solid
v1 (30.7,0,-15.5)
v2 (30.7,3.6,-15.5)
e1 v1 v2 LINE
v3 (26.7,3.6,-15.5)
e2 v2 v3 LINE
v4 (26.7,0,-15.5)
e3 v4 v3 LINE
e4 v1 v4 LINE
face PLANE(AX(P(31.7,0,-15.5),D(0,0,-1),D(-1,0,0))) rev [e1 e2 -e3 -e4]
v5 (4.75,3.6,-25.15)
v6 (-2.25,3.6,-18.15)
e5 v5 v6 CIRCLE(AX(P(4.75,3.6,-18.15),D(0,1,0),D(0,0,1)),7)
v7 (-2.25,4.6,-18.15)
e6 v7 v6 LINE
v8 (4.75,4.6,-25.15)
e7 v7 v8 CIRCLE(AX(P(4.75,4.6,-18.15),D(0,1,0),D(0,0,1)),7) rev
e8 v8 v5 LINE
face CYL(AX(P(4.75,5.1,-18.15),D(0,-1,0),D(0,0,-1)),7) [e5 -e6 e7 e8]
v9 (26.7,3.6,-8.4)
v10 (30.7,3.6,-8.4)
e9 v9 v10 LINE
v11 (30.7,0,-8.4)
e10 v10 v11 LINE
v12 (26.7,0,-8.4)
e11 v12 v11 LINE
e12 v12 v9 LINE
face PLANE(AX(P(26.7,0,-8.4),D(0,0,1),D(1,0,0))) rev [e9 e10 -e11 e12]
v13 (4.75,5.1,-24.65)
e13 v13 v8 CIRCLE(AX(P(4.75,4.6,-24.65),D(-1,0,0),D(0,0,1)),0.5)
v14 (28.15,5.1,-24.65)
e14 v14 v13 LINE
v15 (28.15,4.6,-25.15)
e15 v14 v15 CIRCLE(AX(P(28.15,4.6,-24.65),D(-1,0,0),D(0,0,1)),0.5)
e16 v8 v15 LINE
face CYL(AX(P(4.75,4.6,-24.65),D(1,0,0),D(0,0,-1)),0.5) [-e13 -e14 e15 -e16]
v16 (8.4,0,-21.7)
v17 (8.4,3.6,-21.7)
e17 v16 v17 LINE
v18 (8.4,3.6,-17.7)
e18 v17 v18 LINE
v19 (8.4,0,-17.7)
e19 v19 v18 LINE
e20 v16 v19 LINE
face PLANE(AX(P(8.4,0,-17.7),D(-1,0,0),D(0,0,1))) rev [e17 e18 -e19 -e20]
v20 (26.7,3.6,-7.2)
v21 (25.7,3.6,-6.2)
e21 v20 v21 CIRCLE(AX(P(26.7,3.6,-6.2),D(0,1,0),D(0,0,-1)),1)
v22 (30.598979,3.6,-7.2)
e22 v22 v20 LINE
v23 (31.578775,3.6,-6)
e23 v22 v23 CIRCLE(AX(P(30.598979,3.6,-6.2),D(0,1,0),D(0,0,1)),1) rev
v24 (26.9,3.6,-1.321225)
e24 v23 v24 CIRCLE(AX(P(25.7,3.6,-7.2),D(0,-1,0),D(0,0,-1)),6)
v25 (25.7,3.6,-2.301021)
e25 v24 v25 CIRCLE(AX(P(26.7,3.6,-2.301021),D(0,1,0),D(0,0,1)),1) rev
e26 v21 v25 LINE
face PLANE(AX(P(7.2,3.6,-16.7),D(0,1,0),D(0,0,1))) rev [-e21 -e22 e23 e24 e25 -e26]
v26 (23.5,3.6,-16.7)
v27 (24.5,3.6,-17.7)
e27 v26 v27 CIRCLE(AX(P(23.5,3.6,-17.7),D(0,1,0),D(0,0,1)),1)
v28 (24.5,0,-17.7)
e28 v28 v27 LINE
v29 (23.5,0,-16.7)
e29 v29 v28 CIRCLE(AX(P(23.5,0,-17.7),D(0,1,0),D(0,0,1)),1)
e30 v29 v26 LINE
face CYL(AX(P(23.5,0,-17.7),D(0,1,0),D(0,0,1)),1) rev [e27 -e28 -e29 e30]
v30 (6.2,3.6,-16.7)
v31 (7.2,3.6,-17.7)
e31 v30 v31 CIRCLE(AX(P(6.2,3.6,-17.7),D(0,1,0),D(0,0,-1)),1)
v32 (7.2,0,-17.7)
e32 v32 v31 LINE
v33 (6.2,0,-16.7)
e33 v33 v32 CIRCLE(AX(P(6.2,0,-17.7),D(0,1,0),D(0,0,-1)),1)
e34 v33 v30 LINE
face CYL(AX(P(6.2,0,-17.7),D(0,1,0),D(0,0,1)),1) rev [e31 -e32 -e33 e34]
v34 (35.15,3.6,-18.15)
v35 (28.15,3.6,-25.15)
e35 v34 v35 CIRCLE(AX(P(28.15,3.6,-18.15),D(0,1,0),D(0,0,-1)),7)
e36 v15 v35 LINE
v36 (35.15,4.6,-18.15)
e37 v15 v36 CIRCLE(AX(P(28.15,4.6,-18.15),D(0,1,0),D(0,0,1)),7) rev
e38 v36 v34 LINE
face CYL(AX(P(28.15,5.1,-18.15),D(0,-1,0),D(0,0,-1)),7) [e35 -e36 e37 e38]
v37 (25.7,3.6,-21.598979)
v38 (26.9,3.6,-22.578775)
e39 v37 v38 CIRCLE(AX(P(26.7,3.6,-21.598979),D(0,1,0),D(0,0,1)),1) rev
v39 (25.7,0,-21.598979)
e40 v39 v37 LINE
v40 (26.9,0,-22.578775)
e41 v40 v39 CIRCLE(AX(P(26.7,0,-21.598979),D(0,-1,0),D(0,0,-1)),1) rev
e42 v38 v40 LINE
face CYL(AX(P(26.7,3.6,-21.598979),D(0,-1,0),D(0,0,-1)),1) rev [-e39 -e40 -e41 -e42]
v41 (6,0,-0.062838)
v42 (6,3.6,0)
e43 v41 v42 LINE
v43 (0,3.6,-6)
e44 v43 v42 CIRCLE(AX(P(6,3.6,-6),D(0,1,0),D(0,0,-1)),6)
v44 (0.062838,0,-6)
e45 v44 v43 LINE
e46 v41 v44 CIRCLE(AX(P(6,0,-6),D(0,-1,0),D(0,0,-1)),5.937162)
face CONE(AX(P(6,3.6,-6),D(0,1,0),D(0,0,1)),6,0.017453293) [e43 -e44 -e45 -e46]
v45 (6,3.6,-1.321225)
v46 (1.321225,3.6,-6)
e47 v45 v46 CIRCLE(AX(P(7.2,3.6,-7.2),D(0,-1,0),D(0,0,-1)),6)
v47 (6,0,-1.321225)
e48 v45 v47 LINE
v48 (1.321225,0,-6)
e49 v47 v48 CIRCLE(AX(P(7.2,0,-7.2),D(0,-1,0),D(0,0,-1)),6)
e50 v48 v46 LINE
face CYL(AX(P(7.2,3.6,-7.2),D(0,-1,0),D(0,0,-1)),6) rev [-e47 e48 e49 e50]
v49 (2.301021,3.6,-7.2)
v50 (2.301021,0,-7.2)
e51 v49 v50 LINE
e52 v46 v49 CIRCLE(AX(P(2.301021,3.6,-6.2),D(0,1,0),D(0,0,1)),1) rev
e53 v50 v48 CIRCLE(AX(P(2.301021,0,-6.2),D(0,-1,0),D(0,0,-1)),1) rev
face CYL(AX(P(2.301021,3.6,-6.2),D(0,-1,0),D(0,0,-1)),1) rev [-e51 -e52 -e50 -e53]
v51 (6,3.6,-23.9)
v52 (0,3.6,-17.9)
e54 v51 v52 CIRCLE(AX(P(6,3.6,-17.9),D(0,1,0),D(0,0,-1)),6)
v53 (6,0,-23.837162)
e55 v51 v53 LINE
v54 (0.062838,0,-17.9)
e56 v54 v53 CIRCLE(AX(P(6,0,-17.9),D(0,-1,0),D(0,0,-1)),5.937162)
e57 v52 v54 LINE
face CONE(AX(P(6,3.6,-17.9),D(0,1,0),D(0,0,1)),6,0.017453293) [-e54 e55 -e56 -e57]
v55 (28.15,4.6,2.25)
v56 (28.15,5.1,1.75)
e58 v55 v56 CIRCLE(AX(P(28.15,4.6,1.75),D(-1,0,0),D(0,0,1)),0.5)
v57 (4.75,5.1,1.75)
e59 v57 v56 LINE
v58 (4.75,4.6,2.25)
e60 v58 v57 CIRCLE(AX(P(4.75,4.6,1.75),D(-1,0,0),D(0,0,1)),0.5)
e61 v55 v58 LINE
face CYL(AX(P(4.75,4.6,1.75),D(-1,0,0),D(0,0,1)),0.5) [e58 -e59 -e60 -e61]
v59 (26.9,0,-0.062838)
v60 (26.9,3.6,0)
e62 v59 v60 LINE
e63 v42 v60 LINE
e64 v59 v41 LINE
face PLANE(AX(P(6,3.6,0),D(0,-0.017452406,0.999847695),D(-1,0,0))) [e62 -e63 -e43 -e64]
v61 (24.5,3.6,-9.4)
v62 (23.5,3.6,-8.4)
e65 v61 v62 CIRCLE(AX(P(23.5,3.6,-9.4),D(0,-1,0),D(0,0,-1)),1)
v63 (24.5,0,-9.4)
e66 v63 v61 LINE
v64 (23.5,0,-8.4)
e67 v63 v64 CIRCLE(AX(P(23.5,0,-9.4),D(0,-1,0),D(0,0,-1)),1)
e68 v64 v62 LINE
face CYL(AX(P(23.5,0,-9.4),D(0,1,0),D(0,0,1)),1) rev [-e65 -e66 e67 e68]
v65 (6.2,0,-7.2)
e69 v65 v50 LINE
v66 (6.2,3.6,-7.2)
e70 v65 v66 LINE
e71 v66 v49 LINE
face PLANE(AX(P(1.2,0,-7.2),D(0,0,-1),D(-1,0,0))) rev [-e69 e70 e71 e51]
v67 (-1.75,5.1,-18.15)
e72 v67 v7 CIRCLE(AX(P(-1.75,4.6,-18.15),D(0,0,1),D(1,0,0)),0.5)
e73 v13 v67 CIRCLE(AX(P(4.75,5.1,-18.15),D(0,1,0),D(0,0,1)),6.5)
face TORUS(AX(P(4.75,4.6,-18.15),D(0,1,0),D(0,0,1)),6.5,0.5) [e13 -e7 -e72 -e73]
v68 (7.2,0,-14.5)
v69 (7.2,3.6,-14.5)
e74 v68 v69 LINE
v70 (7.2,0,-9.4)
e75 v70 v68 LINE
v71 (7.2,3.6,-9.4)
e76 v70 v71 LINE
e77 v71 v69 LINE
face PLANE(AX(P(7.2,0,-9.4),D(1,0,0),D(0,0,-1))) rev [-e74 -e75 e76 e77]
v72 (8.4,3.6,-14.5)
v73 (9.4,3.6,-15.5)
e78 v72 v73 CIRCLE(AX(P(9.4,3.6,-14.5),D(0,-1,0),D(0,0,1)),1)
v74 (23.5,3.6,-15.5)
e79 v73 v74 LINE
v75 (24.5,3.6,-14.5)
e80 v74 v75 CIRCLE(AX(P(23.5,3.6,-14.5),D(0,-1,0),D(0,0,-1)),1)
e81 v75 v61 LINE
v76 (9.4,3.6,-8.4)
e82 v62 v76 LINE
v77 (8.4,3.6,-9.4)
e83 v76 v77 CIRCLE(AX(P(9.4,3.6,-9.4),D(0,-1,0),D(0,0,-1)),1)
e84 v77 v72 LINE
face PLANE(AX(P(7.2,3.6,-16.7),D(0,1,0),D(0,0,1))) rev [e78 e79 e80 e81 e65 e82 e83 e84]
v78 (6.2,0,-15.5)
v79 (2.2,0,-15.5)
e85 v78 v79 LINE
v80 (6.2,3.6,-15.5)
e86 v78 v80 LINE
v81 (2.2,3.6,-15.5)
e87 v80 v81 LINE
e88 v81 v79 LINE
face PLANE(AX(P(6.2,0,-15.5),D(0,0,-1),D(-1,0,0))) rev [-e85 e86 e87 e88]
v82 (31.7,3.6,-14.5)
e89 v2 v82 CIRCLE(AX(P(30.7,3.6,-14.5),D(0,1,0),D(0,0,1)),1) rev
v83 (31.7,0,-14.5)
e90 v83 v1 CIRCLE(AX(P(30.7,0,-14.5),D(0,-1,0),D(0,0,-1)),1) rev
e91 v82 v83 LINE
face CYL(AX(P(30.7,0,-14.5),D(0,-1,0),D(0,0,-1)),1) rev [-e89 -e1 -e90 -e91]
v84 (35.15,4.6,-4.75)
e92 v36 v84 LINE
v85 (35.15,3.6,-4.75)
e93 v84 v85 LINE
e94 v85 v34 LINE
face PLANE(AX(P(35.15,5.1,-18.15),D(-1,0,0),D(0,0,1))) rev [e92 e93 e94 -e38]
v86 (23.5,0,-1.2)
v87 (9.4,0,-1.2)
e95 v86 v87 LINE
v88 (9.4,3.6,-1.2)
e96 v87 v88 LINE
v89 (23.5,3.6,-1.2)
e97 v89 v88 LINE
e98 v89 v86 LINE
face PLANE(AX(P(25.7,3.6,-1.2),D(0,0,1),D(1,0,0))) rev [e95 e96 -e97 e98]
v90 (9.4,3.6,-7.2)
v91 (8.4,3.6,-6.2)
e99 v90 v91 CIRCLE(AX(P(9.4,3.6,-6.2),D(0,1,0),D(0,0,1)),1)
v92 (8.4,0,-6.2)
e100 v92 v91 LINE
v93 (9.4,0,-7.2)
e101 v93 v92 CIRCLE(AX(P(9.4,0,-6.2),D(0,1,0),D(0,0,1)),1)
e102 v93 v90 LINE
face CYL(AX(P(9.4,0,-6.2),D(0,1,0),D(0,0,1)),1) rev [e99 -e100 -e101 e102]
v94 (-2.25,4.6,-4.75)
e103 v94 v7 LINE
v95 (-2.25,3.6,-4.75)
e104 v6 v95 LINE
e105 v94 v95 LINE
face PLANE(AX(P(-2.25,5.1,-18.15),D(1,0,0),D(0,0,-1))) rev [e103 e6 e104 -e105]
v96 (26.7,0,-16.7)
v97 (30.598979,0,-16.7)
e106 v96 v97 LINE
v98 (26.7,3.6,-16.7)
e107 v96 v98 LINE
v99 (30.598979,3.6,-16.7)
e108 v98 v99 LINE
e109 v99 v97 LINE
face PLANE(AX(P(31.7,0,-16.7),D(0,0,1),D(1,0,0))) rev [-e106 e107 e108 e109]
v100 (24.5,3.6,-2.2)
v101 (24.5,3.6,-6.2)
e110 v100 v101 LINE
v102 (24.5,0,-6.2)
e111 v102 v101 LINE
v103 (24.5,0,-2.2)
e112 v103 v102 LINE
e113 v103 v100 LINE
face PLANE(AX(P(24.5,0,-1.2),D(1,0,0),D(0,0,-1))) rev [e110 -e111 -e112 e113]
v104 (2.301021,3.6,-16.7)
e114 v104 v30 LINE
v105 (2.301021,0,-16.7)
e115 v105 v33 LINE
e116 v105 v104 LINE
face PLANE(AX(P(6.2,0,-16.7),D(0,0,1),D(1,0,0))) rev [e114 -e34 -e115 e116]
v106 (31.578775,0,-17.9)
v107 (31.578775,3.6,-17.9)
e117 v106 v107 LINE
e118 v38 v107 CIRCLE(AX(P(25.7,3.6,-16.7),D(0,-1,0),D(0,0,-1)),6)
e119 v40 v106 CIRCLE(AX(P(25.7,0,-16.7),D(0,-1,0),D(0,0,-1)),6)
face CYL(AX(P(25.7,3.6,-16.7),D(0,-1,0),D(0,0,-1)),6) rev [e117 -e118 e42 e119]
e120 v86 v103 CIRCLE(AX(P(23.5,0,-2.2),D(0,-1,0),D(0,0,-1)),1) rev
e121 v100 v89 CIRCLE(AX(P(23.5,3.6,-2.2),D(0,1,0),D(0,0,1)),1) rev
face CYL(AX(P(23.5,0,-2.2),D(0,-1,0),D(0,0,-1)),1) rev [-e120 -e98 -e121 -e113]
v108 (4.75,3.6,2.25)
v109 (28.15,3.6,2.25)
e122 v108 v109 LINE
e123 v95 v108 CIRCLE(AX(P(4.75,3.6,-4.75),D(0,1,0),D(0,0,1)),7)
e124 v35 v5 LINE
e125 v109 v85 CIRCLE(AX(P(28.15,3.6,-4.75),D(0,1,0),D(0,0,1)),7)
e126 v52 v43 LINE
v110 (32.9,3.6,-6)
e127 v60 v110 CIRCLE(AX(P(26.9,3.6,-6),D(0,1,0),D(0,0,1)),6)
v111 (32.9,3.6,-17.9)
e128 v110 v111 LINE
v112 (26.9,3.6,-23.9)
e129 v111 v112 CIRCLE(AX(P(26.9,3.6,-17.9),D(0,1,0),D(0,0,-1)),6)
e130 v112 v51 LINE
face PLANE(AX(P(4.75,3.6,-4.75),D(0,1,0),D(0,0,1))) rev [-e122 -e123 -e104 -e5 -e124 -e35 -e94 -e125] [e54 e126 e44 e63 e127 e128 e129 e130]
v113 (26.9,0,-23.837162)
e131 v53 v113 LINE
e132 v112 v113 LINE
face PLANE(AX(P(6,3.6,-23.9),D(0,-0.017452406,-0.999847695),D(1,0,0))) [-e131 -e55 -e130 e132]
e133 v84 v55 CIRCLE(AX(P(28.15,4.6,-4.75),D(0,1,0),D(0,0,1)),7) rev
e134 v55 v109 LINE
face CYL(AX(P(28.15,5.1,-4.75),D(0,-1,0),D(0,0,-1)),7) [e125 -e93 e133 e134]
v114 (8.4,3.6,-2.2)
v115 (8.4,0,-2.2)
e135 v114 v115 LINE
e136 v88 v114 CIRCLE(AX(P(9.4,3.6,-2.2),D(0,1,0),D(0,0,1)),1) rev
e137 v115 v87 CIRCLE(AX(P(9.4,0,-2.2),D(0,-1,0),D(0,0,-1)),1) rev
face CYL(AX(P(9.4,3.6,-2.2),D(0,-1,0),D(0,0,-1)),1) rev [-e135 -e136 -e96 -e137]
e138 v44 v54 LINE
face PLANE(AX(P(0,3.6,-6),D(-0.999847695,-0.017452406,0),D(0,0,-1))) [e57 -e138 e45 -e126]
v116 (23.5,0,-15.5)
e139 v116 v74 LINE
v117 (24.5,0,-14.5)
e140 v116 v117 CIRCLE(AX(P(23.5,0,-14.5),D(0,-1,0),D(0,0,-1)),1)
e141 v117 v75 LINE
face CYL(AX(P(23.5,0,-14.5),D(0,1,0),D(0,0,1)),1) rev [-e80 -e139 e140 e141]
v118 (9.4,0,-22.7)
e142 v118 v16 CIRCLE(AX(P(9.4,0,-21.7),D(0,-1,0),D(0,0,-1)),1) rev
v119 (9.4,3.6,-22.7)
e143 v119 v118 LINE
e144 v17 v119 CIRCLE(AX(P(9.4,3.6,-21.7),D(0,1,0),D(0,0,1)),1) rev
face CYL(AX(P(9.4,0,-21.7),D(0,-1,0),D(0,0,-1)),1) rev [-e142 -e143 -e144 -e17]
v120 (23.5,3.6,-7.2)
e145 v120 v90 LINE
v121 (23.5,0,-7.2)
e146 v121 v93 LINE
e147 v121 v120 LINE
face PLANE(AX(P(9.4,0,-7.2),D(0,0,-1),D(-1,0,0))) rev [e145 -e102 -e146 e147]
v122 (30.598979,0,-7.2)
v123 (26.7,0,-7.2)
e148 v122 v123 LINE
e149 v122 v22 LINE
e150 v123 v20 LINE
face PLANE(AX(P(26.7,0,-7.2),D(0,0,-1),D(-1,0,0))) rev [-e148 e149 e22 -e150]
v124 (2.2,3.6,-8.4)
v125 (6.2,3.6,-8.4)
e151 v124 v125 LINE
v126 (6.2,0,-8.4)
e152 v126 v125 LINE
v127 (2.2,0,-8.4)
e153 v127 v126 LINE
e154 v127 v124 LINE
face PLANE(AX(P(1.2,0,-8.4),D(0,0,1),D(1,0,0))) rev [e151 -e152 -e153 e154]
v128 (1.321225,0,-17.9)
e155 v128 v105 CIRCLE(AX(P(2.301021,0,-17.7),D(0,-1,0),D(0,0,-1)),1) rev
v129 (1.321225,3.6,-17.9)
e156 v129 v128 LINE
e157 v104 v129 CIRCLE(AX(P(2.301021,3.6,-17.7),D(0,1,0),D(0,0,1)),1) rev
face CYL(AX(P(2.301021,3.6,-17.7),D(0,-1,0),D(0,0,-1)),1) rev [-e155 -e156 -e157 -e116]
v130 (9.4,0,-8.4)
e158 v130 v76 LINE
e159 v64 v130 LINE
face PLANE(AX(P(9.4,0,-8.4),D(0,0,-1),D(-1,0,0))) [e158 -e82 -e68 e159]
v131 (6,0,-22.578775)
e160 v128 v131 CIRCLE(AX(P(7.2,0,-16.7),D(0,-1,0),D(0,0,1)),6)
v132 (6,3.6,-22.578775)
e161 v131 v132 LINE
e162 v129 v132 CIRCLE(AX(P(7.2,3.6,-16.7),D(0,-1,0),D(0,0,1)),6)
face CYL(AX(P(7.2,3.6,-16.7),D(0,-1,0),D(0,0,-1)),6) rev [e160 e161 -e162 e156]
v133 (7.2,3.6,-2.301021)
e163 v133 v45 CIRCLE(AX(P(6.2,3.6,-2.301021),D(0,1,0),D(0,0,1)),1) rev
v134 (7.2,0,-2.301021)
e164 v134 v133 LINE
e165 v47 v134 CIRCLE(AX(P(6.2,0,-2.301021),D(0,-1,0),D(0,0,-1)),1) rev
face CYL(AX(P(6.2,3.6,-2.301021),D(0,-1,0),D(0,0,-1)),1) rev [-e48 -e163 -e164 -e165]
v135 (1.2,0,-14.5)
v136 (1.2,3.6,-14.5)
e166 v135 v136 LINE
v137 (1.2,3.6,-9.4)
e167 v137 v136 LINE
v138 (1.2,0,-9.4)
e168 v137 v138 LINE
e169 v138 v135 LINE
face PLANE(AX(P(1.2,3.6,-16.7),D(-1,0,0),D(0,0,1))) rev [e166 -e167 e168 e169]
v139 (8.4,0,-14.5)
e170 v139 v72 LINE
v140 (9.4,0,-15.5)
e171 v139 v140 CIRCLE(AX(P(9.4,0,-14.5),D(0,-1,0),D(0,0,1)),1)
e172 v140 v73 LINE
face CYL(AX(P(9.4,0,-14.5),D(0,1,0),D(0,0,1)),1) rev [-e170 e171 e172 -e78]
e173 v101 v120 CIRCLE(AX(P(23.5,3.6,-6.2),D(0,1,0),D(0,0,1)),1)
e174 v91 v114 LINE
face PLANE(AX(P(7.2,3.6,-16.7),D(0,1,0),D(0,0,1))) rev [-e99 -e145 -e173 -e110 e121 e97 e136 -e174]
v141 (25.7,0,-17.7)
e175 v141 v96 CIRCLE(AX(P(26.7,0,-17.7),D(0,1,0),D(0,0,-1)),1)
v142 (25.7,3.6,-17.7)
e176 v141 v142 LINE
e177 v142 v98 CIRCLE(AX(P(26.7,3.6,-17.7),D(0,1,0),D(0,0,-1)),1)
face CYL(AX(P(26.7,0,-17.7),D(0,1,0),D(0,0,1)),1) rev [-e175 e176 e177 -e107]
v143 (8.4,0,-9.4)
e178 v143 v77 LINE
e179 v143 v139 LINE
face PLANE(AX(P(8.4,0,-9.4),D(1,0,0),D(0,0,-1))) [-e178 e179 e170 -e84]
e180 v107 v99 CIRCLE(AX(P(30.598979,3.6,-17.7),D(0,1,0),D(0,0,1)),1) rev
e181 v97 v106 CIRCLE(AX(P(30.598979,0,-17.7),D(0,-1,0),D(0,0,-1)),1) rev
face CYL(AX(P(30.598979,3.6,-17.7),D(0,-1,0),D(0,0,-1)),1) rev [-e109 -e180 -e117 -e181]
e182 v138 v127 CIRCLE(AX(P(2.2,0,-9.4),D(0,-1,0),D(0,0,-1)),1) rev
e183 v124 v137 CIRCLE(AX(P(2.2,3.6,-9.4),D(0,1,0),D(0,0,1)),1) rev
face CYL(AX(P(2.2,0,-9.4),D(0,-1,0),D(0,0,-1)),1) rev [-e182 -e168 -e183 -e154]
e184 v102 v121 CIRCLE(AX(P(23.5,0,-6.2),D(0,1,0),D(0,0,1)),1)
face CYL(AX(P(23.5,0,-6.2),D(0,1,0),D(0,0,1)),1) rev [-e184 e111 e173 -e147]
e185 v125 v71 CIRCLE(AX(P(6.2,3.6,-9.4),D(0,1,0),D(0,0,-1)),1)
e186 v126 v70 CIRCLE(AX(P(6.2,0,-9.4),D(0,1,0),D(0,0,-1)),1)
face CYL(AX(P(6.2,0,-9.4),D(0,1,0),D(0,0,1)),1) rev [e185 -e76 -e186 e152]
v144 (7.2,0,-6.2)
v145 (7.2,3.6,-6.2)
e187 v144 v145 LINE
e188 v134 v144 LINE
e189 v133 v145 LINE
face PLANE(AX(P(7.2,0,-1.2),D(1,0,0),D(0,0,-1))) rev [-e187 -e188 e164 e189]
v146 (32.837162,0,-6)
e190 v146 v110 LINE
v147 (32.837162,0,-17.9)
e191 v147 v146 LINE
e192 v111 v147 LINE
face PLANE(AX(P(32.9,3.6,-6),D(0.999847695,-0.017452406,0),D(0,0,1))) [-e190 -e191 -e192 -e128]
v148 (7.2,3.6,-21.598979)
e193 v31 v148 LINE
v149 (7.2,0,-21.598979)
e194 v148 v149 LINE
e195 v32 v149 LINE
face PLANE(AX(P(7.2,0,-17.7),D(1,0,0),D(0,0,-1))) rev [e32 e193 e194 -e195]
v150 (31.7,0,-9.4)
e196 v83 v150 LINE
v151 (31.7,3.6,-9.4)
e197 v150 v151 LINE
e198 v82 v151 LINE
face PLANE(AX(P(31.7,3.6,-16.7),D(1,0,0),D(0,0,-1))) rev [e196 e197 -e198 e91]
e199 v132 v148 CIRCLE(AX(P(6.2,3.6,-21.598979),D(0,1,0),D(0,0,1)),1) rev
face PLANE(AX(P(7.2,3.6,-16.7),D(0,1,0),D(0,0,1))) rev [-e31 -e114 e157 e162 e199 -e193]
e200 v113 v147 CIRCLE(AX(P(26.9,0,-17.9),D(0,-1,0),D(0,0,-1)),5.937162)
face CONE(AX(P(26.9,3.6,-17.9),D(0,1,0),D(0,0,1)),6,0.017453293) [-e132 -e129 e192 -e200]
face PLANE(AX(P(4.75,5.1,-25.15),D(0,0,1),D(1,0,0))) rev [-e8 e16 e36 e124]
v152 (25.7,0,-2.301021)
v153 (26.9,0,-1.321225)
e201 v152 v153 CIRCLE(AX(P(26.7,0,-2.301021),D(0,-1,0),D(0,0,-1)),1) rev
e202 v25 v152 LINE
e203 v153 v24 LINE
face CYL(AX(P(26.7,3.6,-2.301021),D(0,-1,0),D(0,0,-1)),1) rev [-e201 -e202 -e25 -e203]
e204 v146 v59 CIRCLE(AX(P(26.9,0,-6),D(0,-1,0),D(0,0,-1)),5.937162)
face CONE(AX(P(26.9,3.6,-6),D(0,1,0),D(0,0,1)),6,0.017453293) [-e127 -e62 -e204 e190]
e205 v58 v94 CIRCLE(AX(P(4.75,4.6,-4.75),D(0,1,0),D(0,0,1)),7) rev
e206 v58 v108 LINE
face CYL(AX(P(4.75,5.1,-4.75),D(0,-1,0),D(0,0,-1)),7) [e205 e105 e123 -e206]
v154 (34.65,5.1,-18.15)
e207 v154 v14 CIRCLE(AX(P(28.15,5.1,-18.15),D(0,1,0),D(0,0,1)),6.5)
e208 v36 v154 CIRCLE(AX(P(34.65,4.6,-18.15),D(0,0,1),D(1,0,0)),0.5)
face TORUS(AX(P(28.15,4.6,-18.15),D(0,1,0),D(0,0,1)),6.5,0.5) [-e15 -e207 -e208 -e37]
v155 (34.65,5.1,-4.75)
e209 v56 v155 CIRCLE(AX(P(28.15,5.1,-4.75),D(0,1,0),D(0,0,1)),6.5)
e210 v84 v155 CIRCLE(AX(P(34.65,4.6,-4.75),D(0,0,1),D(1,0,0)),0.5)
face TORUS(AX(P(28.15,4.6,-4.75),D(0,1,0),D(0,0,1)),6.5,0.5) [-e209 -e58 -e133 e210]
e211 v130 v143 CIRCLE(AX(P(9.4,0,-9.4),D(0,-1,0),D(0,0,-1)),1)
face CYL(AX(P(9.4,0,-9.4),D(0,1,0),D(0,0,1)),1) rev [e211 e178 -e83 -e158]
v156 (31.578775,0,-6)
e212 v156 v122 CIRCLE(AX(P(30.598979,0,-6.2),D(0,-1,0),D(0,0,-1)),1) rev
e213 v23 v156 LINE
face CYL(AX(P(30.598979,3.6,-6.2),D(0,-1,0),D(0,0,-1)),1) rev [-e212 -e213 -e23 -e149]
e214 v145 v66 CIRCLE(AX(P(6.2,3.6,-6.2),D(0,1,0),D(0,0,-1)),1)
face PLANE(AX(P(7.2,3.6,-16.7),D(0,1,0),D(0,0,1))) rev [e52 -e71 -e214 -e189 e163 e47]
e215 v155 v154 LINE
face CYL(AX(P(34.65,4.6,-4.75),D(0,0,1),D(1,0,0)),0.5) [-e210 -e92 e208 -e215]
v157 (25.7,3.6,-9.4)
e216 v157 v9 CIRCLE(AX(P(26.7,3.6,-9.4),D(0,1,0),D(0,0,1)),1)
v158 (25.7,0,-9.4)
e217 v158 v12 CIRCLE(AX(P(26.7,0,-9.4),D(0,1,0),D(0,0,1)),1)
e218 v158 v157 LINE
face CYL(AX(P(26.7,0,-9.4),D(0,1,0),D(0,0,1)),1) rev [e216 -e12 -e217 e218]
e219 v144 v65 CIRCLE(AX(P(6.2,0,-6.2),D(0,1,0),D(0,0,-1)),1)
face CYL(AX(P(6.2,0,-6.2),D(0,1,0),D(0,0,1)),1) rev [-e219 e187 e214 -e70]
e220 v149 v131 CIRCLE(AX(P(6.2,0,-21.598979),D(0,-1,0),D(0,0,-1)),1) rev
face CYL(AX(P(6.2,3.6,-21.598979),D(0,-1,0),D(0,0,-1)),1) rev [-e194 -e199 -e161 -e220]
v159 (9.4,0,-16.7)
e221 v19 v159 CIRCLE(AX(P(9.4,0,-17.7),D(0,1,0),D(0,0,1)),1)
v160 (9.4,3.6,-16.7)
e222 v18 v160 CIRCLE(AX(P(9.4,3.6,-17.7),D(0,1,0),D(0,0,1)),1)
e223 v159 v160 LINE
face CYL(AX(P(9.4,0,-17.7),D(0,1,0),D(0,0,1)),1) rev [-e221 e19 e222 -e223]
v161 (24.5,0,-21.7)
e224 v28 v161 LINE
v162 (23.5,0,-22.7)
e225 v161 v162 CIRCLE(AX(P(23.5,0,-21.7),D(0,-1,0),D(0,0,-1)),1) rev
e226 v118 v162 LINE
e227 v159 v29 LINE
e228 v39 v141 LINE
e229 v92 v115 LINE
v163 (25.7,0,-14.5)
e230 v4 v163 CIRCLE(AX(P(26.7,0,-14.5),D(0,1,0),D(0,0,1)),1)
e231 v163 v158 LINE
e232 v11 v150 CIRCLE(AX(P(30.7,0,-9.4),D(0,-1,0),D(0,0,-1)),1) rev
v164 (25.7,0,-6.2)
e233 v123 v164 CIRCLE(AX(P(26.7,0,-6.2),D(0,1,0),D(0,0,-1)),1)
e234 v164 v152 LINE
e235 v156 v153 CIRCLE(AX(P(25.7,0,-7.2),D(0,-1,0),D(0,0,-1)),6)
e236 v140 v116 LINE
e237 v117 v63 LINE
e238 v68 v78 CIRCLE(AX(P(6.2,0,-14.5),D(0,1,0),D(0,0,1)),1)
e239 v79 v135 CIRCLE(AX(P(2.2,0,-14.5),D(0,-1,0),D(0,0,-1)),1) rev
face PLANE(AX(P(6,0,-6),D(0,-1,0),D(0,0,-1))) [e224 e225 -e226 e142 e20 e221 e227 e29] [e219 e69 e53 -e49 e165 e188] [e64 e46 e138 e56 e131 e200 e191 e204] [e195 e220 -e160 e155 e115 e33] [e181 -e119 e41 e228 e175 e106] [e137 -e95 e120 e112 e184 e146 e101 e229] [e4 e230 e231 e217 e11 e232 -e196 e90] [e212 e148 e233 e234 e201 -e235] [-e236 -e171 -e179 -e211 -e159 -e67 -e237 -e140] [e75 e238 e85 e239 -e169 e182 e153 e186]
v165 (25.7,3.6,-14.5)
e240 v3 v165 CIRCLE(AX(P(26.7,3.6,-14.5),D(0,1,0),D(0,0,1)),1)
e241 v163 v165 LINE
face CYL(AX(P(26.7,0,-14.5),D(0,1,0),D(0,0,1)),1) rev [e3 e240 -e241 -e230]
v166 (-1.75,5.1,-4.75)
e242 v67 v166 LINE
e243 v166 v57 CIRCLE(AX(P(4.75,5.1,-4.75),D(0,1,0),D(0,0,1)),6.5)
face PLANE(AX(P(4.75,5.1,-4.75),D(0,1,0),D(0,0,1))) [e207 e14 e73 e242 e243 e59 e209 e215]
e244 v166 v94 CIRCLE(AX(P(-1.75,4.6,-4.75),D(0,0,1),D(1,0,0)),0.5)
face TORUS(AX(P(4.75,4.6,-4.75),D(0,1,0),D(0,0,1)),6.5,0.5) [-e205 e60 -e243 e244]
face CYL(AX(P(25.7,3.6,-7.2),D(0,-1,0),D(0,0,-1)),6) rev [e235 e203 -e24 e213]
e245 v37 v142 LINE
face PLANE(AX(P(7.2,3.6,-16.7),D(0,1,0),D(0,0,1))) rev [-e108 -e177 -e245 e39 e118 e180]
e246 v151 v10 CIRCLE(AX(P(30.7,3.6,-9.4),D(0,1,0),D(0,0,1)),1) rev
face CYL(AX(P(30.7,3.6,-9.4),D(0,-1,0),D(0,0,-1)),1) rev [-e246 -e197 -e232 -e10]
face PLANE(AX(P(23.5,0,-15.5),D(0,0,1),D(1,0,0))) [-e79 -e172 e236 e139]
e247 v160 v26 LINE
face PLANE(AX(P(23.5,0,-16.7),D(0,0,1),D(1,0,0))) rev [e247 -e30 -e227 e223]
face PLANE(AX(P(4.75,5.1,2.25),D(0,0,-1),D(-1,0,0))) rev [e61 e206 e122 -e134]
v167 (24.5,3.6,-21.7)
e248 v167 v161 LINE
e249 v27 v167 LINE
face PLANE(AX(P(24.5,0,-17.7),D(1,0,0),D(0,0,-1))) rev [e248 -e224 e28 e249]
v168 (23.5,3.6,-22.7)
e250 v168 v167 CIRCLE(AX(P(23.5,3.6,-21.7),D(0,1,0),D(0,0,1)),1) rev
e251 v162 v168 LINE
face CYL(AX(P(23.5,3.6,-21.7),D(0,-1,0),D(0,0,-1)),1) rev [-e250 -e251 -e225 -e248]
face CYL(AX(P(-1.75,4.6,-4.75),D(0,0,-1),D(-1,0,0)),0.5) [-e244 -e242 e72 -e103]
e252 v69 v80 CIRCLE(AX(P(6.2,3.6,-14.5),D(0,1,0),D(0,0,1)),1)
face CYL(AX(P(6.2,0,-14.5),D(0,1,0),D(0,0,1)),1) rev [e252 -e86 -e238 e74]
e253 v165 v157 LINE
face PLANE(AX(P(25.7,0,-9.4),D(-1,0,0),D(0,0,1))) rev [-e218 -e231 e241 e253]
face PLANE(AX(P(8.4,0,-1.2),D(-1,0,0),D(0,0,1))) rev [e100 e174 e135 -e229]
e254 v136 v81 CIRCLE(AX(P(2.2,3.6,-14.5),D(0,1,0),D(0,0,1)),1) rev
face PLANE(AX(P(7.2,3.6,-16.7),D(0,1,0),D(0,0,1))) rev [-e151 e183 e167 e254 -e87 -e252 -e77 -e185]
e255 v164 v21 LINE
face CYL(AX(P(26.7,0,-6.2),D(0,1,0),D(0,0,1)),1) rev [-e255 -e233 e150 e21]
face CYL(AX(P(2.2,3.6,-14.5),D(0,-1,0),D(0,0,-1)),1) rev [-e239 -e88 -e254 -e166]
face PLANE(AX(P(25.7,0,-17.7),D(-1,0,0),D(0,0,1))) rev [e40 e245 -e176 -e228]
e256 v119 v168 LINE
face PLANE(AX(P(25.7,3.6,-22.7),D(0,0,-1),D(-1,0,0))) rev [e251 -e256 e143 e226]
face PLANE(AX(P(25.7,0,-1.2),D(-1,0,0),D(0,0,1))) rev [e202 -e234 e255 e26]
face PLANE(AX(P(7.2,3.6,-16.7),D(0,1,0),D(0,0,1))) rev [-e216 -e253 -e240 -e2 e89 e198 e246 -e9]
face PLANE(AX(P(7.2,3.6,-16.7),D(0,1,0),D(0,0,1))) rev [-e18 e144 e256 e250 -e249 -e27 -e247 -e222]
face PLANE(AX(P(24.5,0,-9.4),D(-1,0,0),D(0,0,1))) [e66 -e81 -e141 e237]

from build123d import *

# Parameters (mm, degrees)
BOSS_EXTRUDE1_DEPTH = 3.6
BOSS_EXTRUDE2_DEPTH = 1.5
CUT_EXTRUDE1_DEPTH  = 3.6
BOSS_EXTRUDE5_DEPTH = 3.6
CHAMFER1_SIZE       = 3.6
CHAMFER1_SIZE_2     = 0.062838234
FILLET3_R           = 1
FILLET4_R           = 0.5


with BuildPart() as part:
    # Sketch1 → Boss-Extrude1 (new body)
    with BuildSketch(Plane(origin=(0, 0, 0), x_dir=(1, 0, 0), z_dir=(0, 1, 0))):
        with BuildLine():
            Line((6, 0), (26.9, 0))
            ThreePointArc((26.9, 0), (31.142640687, 1.757359313), (32.9, 6))
            Line((32.9, 6), (32.9, 17.9))
            ThreePointArc((32.9, 17.9), (31.142640687, 22.142640687), (26.9, 23.9))
            Line((26.9, 23.9), (6, 23.9))
            ThreePointArc((6, 23.9), (1.757359313, 22.142640687), (0, 17.9))
            Line((0, 17.9), (0, 6))
            ThreePointArc((0, 6), (1.757359313, 1.757359313), (6, 0))
        make_face()
    extrude(amount=BOSS_EXTRUDE1_DEPTH)

    # Sketch2 → Boss-Extrude2 (add)
    with BuildSketch(Plane(origin=(0, 3.6, 0), x_dir=(1, 0, 0), z_dir=(0, 1, 0))):
        with BuildLine():
            Line((4.75, 25.15), (28.15, 25.15))
            ThreePointArc((28.15, 25.15), (33.099747468, 23.099747468), (35.15, 18.15))
            Line((35.15, 18.15), (35.15, 4.75))
            ThreePointArc((35.15, 4.75), (33.099747468, -0.199747468), (28.15, -2.25))
            Line((28.15, -2.25), (4.75, -2.25))
            ThreePointArc((4.75, -2.25), (-0.199747468, -0.199747468), (-2.25, 4.75))
            Line((-2.25, 4.75), (-2.25, 18.15))
            ThreePointArc((-2.25, 18.15), (-0.199747468, 23.099747468), (4.75, 25.15))
        make_face()
    extrude(amount=BOSS_EXTRUDE2_DEPTH)

    # Sketch3 → Cut-Extrude1 (cut)
    with BuildSketch(Plane.XZ):
        with BuildLine():
            Line((25.7, -22.7), (7.2, -22.7))
            ThreePointArc((7.2, -22.7), (2.957359313, -20.942640687), (1.2, -16.7))
            Line((1.2, -16.7), (1.2, -7.2))
            ThreePointArc((1.2, -7.2), (2.957359313, -2.957359313), (7.2, -1.2))
            Line((7.2, -1.2), (25.7, -1.2))
            ThreePointArc((25.7, -1.2), (29.942640687, -2.957359313), (31.7, -7.2))
            Line((31.7, -7.2), (31.7, -16.7))
            ThreePointArc((31.7, -16.7), (29.942640687, -20.942640687), (25.7, -22.7))
        make_face()
    extrude(amount=-CUT_EXTRUDE1_DEPTH, mode=Mode.SUBTRACT)

    # Sketch5 → Boss-Extrude5 (add)
    with BuildSketch(Plane.XZ.offset(-3.6)):
        with BuildLine():
            Line((7.2, -1.2), (8.4, -1.2))
            Line((8.4, -1.2), (8.4, -6.2))
            ThreePointArc((8.4, -6.2), (8.692893219, -6.907106781), (9.4, -7.2))
            Line((9.4, -7.2), (23.5, -7.2))
            ThreePointArc((23.5, -7.2), (24.207106781, -6.907106781), (24.5, -6.2))
            Line((24.5, -6.2), (24.5, -1.2))
            Line((24.5, -1.2), (25.7, -1.2))
            Line((25.7, -1.2), (25.7, -6.2))
            ThreePointArc((25.7, -6.2), (25.992893219, -6.907106781), (26.7, -7.2))
            Line((26.7, -7.2), (31.7, -7.2))
            Line((31.7, -7.2), (31.7, -8.4))
            Line((31.7, -8.4), (26.7, -8.4))
            ThreePointArc((26.7, -8.4), (25.992893219, -8.692893219), (25.7, -9.4))
            Line((25.7, -9.4), (25.7, -14.5))
            ThreePointArc((25.7, -14.5), (25.992893219, -15.207106781), (26.7, -15.5))
            Line((26.7, -15.5), (31.7, -15.5))
            Line((31.7, -15.5), (31.7, -16.7))
            Line((31.7, -16.7), (26.7, -16.7))
            ThreePointArc((26.7, -16.7), (25.992893219, -16.992893219), (25.7, -17.7))
            Line((25.7, -17.7), (25.7, -22.7))
            Line((25.7, -22.7), (24.5, -22.7))
            Line((24.5, -22.7), (24.5, -17.7))
            ThreePointArc((24.5, -17.7), (24.207106781, -16.992893219), (23.5, -16.7))
            Line((23.5, -16.7), (9.4, -16.7))
            ThreePointArc((9.4, -16.7), (8.692893219, -16.992893219), (8.4, -17.7))
            Line((8.4, -17.7), (8.4, -22.7))
            Line((8.4, -22.7), (7.2, -22.7))
            Line((7.2, -22.7), (7.2, -17.7))
            ThreePointArc((7.2, -17.7), (6.907106781, -16.992893219), (6.2, -16.7))
            Line((6.2, -16.7), (1.2, -16.7))
            Line((1.2, -16.7), (1.2, -15.5))
            Line((1.2, -15.5), (6.2, -15.5))
            ThreePointArc((6.2, -15.5), (6.907106781, -15.207106781), (7.2, -14.5))
            Line((7.2, -14.5), (7.2, -9.4))
            ThreePointArc((7.2, -9.4), (6.907106781, -8.692893219), (6.2, -8.4))
            Line((6.2, -8.4), (1.2, -8.4))
            Line((1.2, -8.4), (1.2, -7.2))
            Line((1.2, -7.2), (6.2, -7.2))
            ThreePointArc((6.2, -7.2), (6.907106781, -6.907106781), (7.2, -6.2))
            Line((7.2, -6.2), (7.2, -1.2))
        make_face()
        with BuildLine():
            Line((9.4, -8.4), (23.5, -8.4))
            ThreePointArc((23.5, -8.4), (24.207106781, -8.692893219), (24.5, -9.4))
            Line((24.5, -9.4), (24.5, -14.5))
            ThreePointArc((24.5, -14.5), (24.207106781, -15.207106781), (23.5, -15.5))
            Line((23.5, -15.5), (9.4, -15.5))
            ThreePointArc((9.4, -15.5), (8.692893219, -15.207106781), (8.4, -14.5))
            Line((8.4, -14.5), (8.4, -9.4))
            ThreePointArc((8.4, -9.4), (8.692893219, -8.692893219), (9.4, -8.4))
        make_face(mode=Mode.SUBTRACT)
    extrude(amount=BOSS_EXTRUDE5_DEPTH)

    # Chamfer1
    # the kernel refuses this chamfer: 3.6, 0.062838234 mm, written as the material it takes off along each edge
    with BuildSketch(Plane(origin=(0, 0, -17.9), x_dir=(-0.0006712501823120534, 0.9999997747115711, 0), z_dir=(0, 0, 1))) as chamfer1_piece_1_section:
        Polygon((CHAMFER1_SIZE * 0.999999774712, -CHAMFER1_SIZE * 0.000671250182312), (-CHAMFER1_SIZE_2 * 0.000671250179552, -CHAMFER1_SIZE_2 * 0.999999770599), (0, 0), align=None)
    chamfer1_piece_1 = extrude(amount=11.9, mode=Mode.PRIVATE)
    chamfer1_piece_1 = split(chamfer1_piece_1, bisect_by=Plane(origin=(-0.01902042, 3.6, -11.95), z_dir=(0, -1, 0)), keep=Keep.TOP, mode=Mode.PRIVATE)
    add(chamfer1_piece_1, mode=Mode.SUBTRACT)
    with BuildSketch(Plane(origin=(6, 0, -6), x_dir=(-1, 0, 0), z_dir=(0, 0, -1))) as chamfer1_piece_2_section:
        Polygon((6, CHAMFER1_SIZE), (6 - CHAMFER1_SIZE_2 * 0.999999995888, 0), (6, 0), align=None)
    chamfer1_piece_2 = revolve(axis=Axis((6, 0, -6), (0, 1, 0)), revolution_arc=90, mode=Mode.PRIVATE)
    chamfer1_piece_2 = split(chamfer1_piece_2, bisect_by=Plane(origin=(1.769655981, 3.6, -1.769655981), z_dir=(0, -1, 0)), keep=Keep.TOP, mode=Mode.PRIVATE)
    add(chamfer1_piece_2, mode=Mode.SUBTRACT)
    with BuildSketch(Plane(origin=(6, 0, -17.9), x_dir=(0, 0, -1), z_dir=(1, 0, 0))) as chamfer1_piece_3_section:
        Polygon((6, CHAMFER1_SIZE), (6 - CHAMFER1_SIZE_2 * 0.999999995888, 0), (6, 0), align=None)
    chamfer1_piece_3 = revolve(axis=Axis((6, 0, -17.9), (0, 1, 0)), revolution_arc=90, mode=Mode.PRIVATE)
    chamfer1_piece_3 = split(chamfer1_piece_3, bisect_by=Plane(origin=(1.769655981, 3.6, -22.130344019), z_dir=(0, -1, 0)), keep=Keep.TOP, mode=Mode.PRIVATE)
    add(chamfer1_piece_3, mode=Mode.SUBTRACT)
    with BuildSketch(Plane(origin=(6, 0, 0), x_dir=(0, 0.9999997747115711, 0.0006712501823120534), z_dir=(1, 0, 0))) as chamfer1_piece_4_section:
        Polygon((CHAMFER1_SIZE * 0.999999774712, -CHAMFER1_SIZE * 0.000671250182312), (-CHAMFER1_SIZE_2 * 0.000671250179552, -CHAMFER1_SIZE_2 * 0.999999770599), (0, 0), align=None)
    chamfer1_piece_4 = extrude(amount=20.9, mode=Mode.PRIVATE)
    chamfer1_piece_4 = split(chamfer1_piece_4, bisect_by=Plane(origin=(16.45, 3.6, 0.01902042), z_dir=(0, -1, 0)), keep=Keep.TOP, mode=Mode.PRIVATE)
    add(chamfer1_piece_4, mode=Mode.SUBTRACT)
    with BuildSketch(Plane(origin=(26.9, 0, -23.9), x_dir=(0, 0.9999997747115711, -0.0006712501823119971), z_dir=(-1, 0, 0))) as chamfer1_piece_5_section:
        Polygon((CHAMFER1_SIZE * 0.999999774712, -CHAMFER1_SIZE * 0.000671250182312), (-CHAMFER1_SIZE_2 * 0.000671250179552, -CHAMFER1_SIZE_2 * 0.999999770599), (0, 0), align=None)
    chamfer1_piece_5 = extrude(amount=20.9, mode=Mode.PRIVATE)
    chamfer1_piece_5 = split(chamfer1_piece_5, bisect_by=Plane(origin=(16.45, 3.6, -23.91902042), z_dir=(0, -1, 0)), keep=Keep.TOP, mode=Mode.PRIVATE)
    add(chamfer1_piece_5, mode=Mode.SUBTRACT)
    with BuildSketch(Plane(origin=(26.9, 0, -6), x_dir=(0, 0, 1), z_dir=(-1, 0, 0))) as chamfer1_piece_6_section:
        Polygon((6, CHAMFER1_SIZE), (6 - CHAMFER1_SIZE_2 * 0.999999995888, 0), (6, 0), align=None)
    chamfer1_piece_6 = revolve(axis=Axis((26.9, 0, -6), (0, 1, 0)), revolution_arc=90, mode=Mode.PRIVATE)
    chamfer1_piece_6 = split(chamfer1_piece_6, bisect_by=Plane(origin=(31.130344019, 3.6, -1.769655981), z_dir=(0, -1, 0)), keep=Keep.TOP, mode=Mode.PRIVATE)
    add(chamfer1_piece_6, mode=Mode.SUBTRACT)
    with BuildSketch(Plane(origin=(26.9, 0, -17.9), x_dir=(1, 0, 0), z_dir=(0, 0, 1))) as chamfer1_piece_7_section:
        Polygon((6, CHAMFER1_SIZE), (6 - CHAMFER1_SIZE_2 * 0.999999995888, 0), (6, 0), align=None)
    chamfer1_piece_7 = revolve(axis=Axis((26.9, 0, -17.9), (0, 1, 0)), revolution_arc=90, mode=Mode.PRIVATE)
    chamfer1_piece_7 = split(chamfer1_piece_7, bisect_by=Plane(origin=(31.130344019, 3.6, -22.130344019), z_dir=(0, -1, 0)), keep=Keep.TOP, mode=Mode.PRIVATE)
    add(chamfer1_piece_7, mode=Mode.SUBTRACT)
    with BuildSketch(Plane(origin=(32.9, 0, -6), x_dir=(0.000671250182312946, 0.9999997747115711, 0), z_dir=(0, 0, -1))) as chamfer1_piece_8_section:
        Polygon((CHAMFER1_SIZE * 0.999999774712, -CHAMFER1_SIZE * 0.000671250182313), (-CHAMFER1_SIZE_2 * 0.000671250179553, -CHAMFER1_SIZE_2 * 0.999999770599), (0, 0), align=None)
    chamfer1_piece_8 = extrude(amount=11.9, mode=Mode.PRIVATE)
    chamfer1_piece_8 = split(chamfer1_piece_8, bisect_by=Plane(origin=(32.91902042, 3.6, -11.95), z_dir=(0, -1, 0)), keep=Keep.TOP, mode=Mode.PRIVATE)
    add(chamfer1_piece_8, mode=Mode.SUBTRACT)

    # Fillet3
    fillet3_edges = [part.edges().sort_by_distance(p)[0] for p in [
        (1.2, 1.8, -8.4),
        (1.2, 1.8, -15.5),
        (8.4, 1.8, -22.7),
        (24.5, 1.8, -22.7),
        (31.7, 1.8, -15.5),
        (31.7, 1.8, -8.4),
        (24.5, 1.8, -1.2),
        (8.4, 1.8, -1.2),
        (7.2, 1.8, -22.7),
        (1.2, 1.8, -16.7),
        (1.2, 1.8, -7.2),
        (7.2, 1.8, -1.2),
        (25.7, 1.8, -1.2),
        (31.7, 1.8, -7.2),
        (31.7, 1.8, -16.7),
        (25.7, 1.8, -22.7),
    ]]
    fillet(fillet3_edges, radius=FILLET3_R)

    # Fillet4
    fillet4_edges = [part.edges().sort_by_distance(p)[0] for p in [
        (-0.199747468, 5.1, 0.199747468),
        (16.45, 5.1, 2.25),
        (33.099747468, 5.1, 0.199747468),
        (35.15, 5.1, -11.45),
        (33.099747468, 5.1, -23.099747468),
        (16.45, 5.1, -25.15),
        (-0.199747468, 5.1, -23.099747468),
        (-2.25, 5.1, -11.45),
    ]]
    fillet(fillet4_edges, radius=FILLET4_R)


solid = part.part
